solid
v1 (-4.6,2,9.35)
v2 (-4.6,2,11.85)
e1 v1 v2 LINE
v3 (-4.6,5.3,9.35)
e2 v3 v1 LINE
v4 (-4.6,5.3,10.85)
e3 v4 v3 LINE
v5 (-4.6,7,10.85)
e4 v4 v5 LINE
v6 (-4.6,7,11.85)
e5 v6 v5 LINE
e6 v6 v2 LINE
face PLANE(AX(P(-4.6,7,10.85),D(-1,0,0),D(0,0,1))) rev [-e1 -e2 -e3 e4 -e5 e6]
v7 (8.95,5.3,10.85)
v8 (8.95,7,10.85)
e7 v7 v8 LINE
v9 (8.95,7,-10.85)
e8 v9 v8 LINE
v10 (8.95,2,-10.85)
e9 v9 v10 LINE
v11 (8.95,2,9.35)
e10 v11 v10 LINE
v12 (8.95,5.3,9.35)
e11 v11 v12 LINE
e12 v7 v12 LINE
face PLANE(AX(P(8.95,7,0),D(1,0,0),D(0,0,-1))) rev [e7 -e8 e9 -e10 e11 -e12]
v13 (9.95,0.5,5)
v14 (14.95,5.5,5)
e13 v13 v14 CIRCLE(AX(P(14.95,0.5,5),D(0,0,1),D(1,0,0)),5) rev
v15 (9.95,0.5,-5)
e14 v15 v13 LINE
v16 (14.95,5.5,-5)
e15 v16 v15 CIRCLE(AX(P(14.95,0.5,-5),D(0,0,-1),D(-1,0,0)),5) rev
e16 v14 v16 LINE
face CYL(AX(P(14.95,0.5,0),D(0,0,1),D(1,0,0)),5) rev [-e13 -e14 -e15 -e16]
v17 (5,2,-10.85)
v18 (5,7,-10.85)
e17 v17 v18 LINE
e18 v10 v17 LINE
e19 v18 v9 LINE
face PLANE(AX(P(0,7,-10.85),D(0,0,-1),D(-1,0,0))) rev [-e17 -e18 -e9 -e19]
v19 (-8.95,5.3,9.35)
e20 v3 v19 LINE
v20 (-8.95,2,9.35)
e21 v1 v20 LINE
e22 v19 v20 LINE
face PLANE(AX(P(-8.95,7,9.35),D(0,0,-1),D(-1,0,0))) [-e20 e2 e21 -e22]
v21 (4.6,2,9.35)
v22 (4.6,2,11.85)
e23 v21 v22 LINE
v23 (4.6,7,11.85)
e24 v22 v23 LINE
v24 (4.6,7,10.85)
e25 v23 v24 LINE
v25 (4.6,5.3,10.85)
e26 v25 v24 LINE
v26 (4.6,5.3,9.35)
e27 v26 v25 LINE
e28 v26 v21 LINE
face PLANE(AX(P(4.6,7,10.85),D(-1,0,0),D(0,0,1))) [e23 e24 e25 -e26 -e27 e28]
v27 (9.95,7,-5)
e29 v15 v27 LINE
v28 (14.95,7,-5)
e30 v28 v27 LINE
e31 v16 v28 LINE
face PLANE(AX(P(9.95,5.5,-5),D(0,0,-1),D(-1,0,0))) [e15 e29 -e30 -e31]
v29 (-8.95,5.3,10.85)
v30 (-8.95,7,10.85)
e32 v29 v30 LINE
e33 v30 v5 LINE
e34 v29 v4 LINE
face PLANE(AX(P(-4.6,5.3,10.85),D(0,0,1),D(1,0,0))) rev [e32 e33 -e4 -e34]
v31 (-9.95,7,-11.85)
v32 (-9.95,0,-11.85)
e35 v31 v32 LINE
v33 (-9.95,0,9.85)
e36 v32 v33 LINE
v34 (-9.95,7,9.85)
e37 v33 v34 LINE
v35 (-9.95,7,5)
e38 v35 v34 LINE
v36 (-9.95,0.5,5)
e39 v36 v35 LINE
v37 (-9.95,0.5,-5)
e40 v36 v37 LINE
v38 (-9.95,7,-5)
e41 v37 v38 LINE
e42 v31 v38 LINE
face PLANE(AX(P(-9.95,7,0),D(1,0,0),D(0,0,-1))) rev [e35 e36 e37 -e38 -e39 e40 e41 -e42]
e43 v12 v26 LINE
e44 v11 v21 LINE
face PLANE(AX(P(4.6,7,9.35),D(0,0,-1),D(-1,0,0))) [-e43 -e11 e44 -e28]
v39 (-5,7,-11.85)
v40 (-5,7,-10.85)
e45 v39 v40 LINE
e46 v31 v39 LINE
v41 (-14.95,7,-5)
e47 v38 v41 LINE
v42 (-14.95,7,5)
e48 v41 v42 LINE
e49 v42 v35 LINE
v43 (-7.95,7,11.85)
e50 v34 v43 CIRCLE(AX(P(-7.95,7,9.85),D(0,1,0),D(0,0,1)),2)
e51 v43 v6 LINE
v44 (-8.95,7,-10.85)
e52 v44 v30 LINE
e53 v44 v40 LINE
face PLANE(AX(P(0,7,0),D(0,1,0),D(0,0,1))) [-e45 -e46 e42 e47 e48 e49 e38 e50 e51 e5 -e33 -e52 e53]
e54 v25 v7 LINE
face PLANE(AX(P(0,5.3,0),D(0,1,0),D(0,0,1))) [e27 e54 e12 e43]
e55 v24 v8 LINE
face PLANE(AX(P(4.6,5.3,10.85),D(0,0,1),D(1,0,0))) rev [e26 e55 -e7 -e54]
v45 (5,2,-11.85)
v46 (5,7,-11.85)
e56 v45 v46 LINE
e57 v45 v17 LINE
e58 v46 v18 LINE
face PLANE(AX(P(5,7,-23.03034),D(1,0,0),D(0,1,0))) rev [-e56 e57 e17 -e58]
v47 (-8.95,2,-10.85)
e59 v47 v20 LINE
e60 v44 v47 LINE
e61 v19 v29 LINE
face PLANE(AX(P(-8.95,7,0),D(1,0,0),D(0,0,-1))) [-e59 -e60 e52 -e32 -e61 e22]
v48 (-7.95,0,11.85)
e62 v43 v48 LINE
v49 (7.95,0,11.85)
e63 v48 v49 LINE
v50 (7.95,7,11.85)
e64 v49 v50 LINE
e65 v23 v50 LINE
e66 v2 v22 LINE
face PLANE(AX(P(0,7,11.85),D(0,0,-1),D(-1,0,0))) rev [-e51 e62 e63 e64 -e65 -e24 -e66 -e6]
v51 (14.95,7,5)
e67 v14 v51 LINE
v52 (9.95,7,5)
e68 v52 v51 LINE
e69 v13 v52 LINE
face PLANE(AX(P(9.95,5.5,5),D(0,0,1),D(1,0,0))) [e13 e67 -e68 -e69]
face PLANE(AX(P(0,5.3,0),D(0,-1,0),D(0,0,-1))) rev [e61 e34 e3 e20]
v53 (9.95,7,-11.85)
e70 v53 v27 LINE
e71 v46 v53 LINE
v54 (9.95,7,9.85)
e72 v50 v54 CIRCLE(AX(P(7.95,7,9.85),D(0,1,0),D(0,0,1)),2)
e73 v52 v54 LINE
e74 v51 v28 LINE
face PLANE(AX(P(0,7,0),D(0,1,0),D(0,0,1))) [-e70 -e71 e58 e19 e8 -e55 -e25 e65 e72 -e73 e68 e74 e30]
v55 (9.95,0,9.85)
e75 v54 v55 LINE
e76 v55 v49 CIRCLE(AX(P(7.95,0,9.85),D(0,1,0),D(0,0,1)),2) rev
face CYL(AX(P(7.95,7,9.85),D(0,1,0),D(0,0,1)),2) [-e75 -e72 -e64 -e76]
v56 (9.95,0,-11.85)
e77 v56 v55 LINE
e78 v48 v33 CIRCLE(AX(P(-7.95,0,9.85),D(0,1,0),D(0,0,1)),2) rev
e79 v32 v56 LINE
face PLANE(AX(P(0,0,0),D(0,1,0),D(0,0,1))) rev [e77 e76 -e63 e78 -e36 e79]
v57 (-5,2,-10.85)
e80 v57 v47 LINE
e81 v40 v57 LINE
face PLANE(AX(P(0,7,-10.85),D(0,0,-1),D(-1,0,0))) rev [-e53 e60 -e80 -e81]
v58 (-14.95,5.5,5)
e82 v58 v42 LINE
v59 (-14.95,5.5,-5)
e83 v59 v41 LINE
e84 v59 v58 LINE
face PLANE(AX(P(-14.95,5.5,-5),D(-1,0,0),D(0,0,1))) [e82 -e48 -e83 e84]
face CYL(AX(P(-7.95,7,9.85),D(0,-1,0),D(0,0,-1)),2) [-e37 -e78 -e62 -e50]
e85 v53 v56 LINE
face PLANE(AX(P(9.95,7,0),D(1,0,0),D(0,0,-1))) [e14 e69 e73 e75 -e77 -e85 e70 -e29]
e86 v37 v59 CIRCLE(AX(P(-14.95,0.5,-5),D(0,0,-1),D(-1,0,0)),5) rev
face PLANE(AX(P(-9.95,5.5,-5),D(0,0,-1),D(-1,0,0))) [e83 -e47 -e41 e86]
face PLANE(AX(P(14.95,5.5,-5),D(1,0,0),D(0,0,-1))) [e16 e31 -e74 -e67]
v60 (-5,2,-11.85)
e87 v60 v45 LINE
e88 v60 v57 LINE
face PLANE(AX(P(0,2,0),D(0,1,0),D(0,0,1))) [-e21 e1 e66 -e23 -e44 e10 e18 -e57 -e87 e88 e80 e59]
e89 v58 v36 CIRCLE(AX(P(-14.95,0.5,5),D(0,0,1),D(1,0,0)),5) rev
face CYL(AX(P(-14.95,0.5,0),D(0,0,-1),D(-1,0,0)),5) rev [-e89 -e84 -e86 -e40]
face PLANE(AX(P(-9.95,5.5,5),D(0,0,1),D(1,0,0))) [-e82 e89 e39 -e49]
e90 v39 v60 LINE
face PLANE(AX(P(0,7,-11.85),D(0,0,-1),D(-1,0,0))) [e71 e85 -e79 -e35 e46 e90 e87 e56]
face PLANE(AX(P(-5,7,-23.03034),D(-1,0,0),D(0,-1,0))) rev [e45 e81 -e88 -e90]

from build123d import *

# Parameters (mm, degrees)
SKETCH1_W               = 17.9
SKETCH1_H               = 21.7
BOSS_EXTRUDE1_DEPTH     = 2
BOSS_EXTRUDE2_OUTLINE_W = 19.9
BOSS_EXTRUDE2_OUTLINE_H = 23.7
BOSS_EXTRUDE2_DEPTH     = 7
SKETCH3_W               = 10
SKETCH3_H               = 5
CUT_EXTRUDE1_DEPTH      = 1
SKETCH4_W               = 9.2
SKETCH4_H               = 5
CUT_EXTRUDE2_DEPTH      = 1
SKETCH7_W               = 5
SKETCH7_H               = 10
BOSS_EXTRUDE3_DEPTH     = 1.5
FILLET1_R               = 5
SKETCH8_W               = 4.35
SKETCH8_H               = 1.5
CUT_EXTRUDE4_DEPTH      = 1.7
FILLET3_R               = 2


# Read off the part's stored shape, not the designer's step: Boss-Extrude2
with BuildPart() as part:
    # Sketch1 → Boss-Extrude1 (new body)
    with BuildSketch(Plane(origin=(0, 0, 0), x_dir=(1, 0, 0), z_dir=(0, 1, 0))):
        Rectangle(SKETCH1_W, SKETCH1_H)
    extrude(amount=BOSS_EXTRUDE1_DEPTH)

    # Boss-Extrude2 outline → Boss-Extrude2 (add)
    with BuildSketch(Plane(origin=(0, 0, 0), x_dir=(1, 0, 0), z_dir=(0, 1, 0))):
        Rectangle(BOSS_EXTRUDE2_OUTLINE_W, BOSS_EXTRUDE2_OUTLINE_H)
        Polygon((4.6, -9.35), (4.6, -10.85), (-4.6, -10.85), (-4.6, -9.35), (-8.95, -9.35), (-8.95, 10.85), (8.95, 10.85), (8.95, -9.35), align=None, mode=Mode.SUBTRACT)
    extrude(amount=BOSS_EXTRUDE2_DEPTH)

    # Sketch3 → Cut-Extrude1 (cut)
    with BuildSketch(Plane.XY.offset(-10.85)):
        with Locations((0, 4.5)):
            Rectangle(SKETCH3_W, SKETCH3_H)
    extrude(amount=-CUT_EXTRUDE1_DEPTH, mode=Mode.SUBTRACT)

    # Sketch4 → Cut-Extrude2 (cut)
    with BuildSketch(Plane.XY.offset(11.85)):
        with Locations((0, 4.5)):
            Rectangle(SKETCH4_W, SKETCH4_H)
    extrude(amount=-CUT_EXTRUDE2_DEPTH, mode=Mode.SUBTRACT)

    # Sketch7 → Boss-Extrude3 (add)
    with BuildSketch(Plane(origin=(0, 7, 0), x_dir=(1, 0, 0), z_dir=(0, 1, 0))):
        with Locations((-12.45, 0)):
            Rectangle(SKETCH7_W, SKETCH7_H)
        with Locations((12.45, 0)):
            Rectangle(SKETCH7_W, SKETCH7_H)
    extrude(amount=-BOSS_EXTRUDE3_DEPTH)

    # Fillet1
    fillet1_edges = [part.edges().sort_by_distance(p)[0] for p in [
        (9.95, 5.5, 0),
        (-9.95, 5.5, 0),
    ]]
    fillet(fillet1_edges, radius=FILLET1_R - 0.0001)  # a hair under: the kernel refuses the full size

    # Sketch8 → Cut-Extrude4 (cut)
    with BuildSketch(Plane(origin=(0, 7, 0), x_dir=(1, 0, 0), z_dir=(0, 1, 0))):
        with Locations((-6.775, -10.1)):
            Rectangle(SKETCH8_W, SKETCH8_H)
        with Locations((6.775, -10.1)):
            Rectangle(SKETCH8_W, SKETCH8_H)
    extrude(amount=-CUT_EXTRUDE4_DEPTH, mode=Mode.SUBTRACT)

    # Fillet3
    fillet3_edges = [part.edges().sort_by_distance(p)[0] for p in [
        (-9.95, 3.5, 11.85),
        (9.95, 3.5, 11.85),
    ]]
    fillet(fillet3_edges, radius=FILLET3_R)


solid = part.part
